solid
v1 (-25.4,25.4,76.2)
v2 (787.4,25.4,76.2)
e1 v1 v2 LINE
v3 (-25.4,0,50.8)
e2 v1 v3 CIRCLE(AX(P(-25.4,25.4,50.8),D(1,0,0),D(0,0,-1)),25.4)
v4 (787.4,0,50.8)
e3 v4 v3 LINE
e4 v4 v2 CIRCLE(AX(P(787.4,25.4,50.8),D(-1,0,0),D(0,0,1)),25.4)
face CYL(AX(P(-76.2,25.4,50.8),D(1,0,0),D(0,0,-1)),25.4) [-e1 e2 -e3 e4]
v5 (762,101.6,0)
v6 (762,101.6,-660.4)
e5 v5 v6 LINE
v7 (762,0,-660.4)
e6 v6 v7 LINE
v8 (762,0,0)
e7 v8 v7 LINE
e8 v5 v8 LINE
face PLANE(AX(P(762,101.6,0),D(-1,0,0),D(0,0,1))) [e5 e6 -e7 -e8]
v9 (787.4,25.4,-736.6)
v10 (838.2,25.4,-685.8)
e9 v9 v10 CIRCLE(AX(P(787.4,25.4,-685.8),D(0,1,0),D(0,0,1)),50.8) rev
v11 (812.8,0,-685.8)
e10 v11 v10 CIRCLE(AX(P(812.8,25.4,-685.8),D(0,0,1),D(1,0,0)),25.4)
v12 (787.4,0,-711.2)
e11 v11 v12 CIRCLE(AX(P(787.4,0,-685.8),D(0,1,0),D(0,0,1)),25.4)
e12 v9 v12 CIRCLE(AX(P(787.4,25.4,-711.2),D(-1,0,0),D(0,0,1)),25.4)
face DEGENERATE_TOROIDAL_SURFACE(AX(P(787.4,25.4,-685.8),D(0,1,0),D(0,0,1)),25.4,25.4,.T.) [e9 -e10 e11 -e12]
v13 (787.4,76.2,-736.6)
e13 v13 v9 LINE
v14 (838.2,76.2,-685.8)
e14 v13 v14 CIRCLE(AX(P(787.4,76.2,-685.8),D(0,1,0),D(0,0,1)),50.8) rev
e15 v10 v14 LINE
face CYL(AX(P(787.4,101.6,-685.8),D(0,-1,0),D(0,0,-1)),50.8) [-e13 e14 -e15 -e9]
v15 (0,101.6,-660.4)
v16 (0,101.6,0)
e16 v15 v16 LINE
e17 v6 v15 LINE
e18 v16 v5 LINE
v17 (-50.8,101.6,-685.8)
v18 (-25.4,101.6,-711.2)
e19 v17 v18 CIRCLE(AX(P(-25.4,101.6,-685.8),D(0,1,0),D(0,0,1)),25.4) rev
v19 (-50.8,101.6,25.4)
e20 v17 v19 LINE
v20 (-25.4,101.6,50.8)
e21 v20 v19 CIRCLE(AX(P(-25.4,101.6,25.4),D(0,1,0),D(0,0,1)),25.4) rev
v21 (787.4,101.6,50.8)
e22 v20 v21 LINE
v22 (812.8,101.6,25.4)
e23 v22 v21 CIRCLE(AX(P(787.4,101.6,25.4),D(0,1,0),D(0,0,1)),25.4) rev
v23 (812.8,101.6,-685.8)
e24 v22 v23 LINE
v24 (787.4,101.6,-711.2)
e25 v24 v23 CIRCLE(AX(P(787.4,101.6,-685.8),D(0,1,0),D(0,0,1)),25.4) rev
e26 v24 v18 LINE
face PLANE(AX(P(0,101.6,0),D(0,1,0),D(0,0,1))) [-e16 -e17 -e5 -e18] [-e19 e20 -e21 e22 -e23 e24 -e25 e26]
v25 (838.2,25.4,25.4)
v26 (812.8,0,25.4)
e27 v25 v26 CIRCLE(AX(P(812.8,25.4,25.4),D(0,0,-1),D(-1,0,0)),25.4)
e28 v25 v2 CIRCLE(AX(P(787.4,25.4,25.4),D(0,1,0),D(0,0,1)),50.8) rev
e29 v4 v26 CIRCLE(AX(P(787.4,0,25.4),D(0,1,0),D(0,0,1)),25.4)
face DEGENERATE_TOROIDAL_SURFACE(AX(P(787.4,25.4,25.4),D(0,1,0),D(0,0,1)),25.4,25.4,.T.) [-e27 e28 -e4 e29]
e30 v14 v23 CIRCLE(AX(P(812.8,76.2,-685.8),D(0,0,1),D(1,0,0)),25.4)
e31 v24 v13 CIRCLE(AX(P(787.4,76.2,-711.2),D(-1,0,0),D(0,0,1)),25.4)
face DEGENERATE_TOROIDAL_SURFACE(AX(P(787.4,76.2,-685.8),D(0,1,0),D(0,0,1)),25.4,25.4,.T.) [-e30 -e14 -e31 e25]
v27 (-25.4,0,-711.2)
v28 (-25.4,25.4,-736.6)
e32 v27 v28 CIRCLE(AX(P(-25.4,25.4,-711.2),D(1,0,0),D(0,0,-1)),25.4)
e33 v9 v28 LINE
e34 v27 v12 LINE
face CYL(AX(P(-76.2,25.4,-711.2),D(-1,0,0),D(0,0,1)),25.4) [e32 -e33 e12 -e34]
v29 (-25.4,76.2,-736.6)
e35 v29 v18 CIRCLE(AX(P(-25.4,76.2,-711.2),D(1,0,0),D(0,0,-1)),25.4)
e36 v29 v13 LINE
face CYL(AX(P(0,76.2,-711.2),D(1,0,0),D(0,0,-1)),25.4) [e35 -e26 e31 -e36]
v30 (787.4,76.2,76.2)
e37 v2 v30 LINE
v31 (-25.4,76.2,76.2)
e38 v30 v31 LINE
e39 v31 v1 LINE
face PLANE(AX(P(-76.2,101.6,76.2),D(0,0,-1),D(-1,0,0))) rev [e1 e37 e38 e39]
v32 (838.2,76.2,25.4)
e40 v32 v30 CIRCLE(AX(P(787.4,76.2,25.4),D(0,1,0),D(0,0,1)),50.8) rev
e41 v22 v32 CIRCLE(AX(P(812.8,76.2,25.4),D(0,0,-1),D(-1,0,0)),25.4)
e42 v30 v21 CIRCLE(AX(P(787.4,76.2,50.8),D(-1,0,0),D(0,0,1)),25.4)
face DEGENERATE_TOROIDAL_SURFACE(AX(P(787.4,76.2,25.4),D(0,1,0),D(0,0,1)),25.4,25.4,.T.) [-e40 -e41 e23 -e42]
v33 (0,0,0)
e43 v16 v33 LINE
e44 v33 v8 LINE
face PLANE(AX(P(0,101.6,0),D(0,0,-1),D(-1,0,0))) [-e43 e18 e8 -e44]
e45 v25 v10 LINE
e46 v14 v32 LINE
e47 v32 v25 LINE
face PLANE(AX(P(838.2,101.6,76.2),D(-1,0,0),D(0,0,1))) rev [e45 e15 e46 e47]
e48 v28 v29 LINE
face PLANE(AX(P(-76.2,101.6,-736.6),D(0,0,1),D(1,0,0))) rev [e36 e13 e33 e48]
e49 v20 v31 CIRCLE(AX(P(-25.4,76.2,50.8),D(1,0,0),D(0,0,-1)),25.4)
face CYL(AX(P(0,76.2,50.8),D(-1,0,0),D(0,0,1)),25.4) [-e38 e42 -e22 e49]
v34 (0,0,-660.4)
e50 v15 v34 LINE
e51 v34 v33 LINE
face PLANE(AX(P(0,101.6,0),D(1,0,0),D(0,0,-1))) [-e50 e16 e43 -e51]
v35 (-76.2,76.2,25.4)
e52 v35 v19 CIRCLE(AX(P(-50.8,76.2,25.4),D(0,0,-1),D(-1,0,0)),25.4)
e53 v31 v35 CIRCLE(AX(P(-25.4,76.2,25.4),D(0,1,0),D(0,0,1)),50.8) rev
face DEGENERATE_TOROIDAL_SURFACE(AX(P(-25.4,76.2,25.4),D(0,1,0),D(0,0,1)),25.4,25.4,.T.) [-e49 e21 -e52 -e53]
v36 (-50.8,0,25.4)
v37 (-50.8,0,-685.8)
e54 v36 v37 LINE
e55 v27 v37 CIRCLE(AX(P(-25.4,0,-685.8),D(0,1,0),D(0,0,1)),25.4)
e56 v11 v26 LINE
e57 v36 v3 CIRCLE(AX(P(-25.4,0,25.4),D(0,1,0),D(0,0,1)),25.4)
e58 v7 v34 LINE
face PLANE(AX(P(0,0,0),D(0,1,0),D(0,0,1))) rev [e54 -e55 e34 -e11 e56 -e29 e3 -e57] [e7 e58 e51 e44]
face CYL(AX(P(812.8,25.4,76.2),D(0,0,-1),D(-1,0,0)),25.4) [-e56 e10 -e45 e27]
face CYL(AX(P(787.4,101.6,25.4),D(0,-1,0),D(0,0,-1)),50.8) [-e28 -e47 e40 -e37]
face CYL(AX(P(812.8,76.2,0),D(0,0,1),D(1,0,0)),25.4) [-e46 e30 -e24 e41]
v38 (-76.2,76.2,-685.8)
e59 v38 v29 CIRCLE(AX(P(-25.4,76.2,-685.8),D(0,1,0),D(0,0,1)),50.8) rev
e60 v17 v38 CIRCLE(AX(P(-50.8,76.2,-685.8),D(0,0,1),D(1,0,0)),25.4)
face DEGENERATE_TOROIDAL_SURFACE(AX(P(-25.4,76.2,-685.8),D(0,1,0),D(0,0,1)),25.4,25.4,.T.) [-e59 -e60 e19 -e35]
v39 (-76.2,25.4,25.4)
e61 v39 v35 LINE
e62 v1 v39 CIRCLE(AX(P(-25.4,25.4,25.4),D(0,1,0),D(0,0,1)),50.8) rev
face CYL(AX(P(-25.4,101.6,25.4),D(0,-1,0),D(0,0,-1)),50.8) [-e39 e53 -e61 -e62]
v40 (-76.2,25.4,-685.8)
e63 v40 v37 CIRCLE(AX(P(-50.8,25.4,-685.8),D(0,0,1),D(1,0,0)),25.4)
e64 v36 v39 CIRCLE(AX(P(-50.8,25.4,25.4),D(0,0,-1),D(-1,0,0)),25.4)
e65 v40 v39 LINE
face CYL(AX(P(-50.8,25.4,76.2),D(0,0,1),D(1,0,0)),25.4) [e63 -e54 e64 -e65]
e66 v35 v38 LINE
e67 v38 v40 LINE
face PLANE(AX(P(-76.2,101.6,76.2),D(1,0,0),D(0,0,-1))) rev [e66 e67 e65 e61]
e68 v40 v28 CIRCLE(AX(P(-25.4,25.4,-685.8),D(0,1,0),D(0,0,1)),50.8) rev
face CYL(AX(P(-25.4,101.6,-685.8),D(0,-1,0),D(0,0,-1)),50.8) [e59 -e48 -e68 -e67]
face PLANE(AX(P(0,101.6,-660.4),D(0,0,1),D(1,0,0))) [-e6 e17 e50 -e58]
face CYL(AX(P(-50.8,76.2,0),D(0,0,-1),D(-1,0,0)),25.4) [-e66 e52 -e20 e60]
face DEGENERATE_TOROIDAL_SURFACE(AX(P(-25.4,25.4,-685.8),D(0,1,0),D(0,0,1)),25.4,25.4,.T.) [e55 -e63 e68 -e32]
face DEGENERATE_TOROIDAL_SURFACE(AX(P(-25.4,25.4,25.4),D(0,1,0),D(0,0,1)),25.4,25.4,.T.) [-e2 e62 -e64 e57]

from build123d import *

# Parameters (mm, degrees)
SKETCH1_W           = 914.4
SKETCH1_H           = 812.8
SKETCH1_W_2         = 762
SKETCH1_H_2         = 660.4
BOSS_EXTRUDE1_DEPTH = 101.6
FILLET1_R           = 25.4
FILLET2_R           = 25.4
FILLET3_R           = 50.8


with BuildPart() as part:
    # Sketch1 → Boss-Extrude1 (new body)
    with BuildSketch(Plane(origin=(0, 0, 0), x_dir=(1, 0, 0), z_dir=(0, 1, 0))):
        with Locations((381, 330.2)):
            Rectangle(SKETCH1_W, SKETCH1_H)
        with Locations((381, 330.2)):
            Rectangle(SKETCH1_W_2, SKETCH1_H_2, mode=Mode.SUBTRACT)
    extrude(amount=BOSS_EXTRUDE1_DEPTH)

    # Fillet1
    fillet1_edges = [part.edges().sort_by_distance(p)[0] for p in [
        (381, 101.6, -736.6),
        (-76.2, 101.6, -330.2),
        (381, 101.6, 76.2),
        (838.2, 101.6, -330.2),
    ]]
    fillet(fillet1_edges, radius=FILLET1_R)

    # Fillet2
    fillet2_edges = [part.edges().sort_by_distance(p)[0] for p in [
        (-76.2, 0, -330.2),
        (381, 0, -736.6),
        (838.2, 0, -330.2),
        (381, 0, 76.2),
    ]]
    fillet(fillet2_edges, radius=FILLET2_R)

    # Fillet3
    # the kernel refuses this fillet: 50.8 mm, written as the material it takes off along each edge
    with BuildSketch(Plane(origin=(-25.4, 101.6, -685.8), x_dir=(0, 0, -1), z_dir=(1, 0, 0))) as fillet3_piece_1:
        with BuildLine():
            CenterArc((25.4, -25.4), 25.4, 0, 90)
            Line((50.8, -25.4), (50.8, 0))
            Line((50.8, 0), (25.4, 0))
        make_face()
    revolve(axis=Axis((-25.4, 101.6, -685.8), (0, 1, 0)), revolution_arc=90, mode=Mode.SUBTRACT)
    with BuildSketch(Plane(origin=(787.4, 101.6, -685.8), x_dir=(1, 0, 0), z_dir=(0, 0, 1))) as fillet3_piece_2:
        with BuildLine():
            CenterArc((25.4, -25.4), 25.4, 0, 90)
            Line((50.8, -25.4), (50.8, 0))
            Line((50.8, 0), (25.4, 0))
        make_face()
    revolve(axis=Axis((787.4, 101.6, -685.8), (0, 1, 0)), revolution_arc=90, mode=Mode.SUBTRACT)
    with BuildSketch(Plane(origin=(-25.4, 101.6, 25.4), x_dir=(-1, 0, 0), z_dir=(0, 0, -1))) as fillet3_piece_3:
        with BuildLine():
            CenterArc((25.4, -25.4), 25.4, 0, 90)
            Line((50.8, -25.4), (50.8, 0))
            Line((50.8, 0), (25.4, 0))
        make_face()
    revolve(axis=Axis((-25.4, 101.6, 25.4), (0, 1, 0)), revolution_arc=90, mode=Mode.SUBTRACT)
    with BuildSketch(Plane(origin=(787.4, 101.6, 25.4), x_dir=(0, 0, 1), z_dir=(-1, 0, 0))) as fillet3_piece_4:
        with BuildLine():
            CenterArc((25.4, -25.4), 25.4, 0, 90)
            Line((50.8, -25.4), (50.8, 0))
            Line((50.8, 0), (25.4, 0))
        make_face()
    revolve(axis=Axis((787.4, 101.6, 25.4), (0, 1, 0)), revolution_arc=90, mode=Mode.SUBTRACT)
    with BuildSketch(Plane(origin=(787.4, 0, 25.4), x_dir=(1, 0, 0), z_dir=(0, 0, -1))) as fillet3_piece_5:
        with BuildLine():
            CenterArc((25.4, -25.4), 25.4, 0, 90)
            Line((50.8, -25.4), (50.8, 0))
            Line((50.8, 0), (25.4, 0))
        make_face()
    revolve(axis=Axis((787.4, 0, 25.4), (0, -1, 0)), revolution_arc=90, mode=Mode.SUBTRACT)
    with BuildSketch(Plane(origin=(-25.4, 0, 25.4), x_dir=(0, 0, 1), z_dir=(1, 0, 0))) as fillet3_piece_6:
        with BuildLine():
            CenterArc((25.4, -25.4), 25.4, 0, 90)
            Line((50.8, -25.4), (50.8, 0))
            Line((50.8, 0), (25.4, 0))
        make_face()
    revolve(axis=Axis((-25.4, 0, 25.4), (0, -1, 0)), revolution_arc=90, mode=Mode.SUBTRACT)
    with BuildSketch(Plane(origin=(787.4, 0, -685.8), x_dir=(0, 0, -1), z_dir=(-1, 0, 0))) as fillet3_piece_7:
        with BuildLine():
            CenterArc((25.4, -25.4), 25.4, 0, 90)
            Line((50.8, -25.4), (50.8, 0))
            Line((50.8, 0), (25.4, 0))
        make_face()
    revolve(axis=Axis((787.4, 0, -685.8), (0, -1, 0)), revolution_arc=90, mode=Mode.SUBTRACT)
    with BuildSketch(Plane(origin=(-25.4, 0, -685.8), x_dir=(-1, 0, 0), z_dir=(0, 0, 1))) as fillet3_piece_8:
        with BuildLine():
            CenterArc((25.4, -25.4), 25.4, 0, 90)
            Line((50.8, -25.4), (50.8, 0))
            Line((50.8, 0), (25.4, 0))
        make_face()
    revolve(axis=Axis((-25.4, 0, -685.8), (0, -1, 0)), revolution_arc=90, mode=Mode.SUBTRACT)
    with BuildSketch(Plane(origin=(838.2, 0, 76.2), x_dir=(-1, 0, 0), z_dir=(0, 1, 0)), Plane(origin=(-76.2, 0, 76.2), x_dir=(0, 0, -1), z_dir=(0, 1, 0))) as fillet3_piece_9:
        with BuildLine():
            CenterArc((FILLET3_R, -FILLET3_R), FILLET3_R, 90, 90)
            Line((0, -FILLET3_R), (0, 0))
            Line((0, 0), (FILLET3_R, 0))
        make_face()
    extrude(amount=101.6, mode=Mode.SUBTRACT)
    with BuildSketch(Plane(origin=(838.2, 0, -736.6), x_dir=(-1, 0, 0), z_dir=(0, 1, 0)), Plane(origin=(-76.2, 0, -736.6), x_dir=(0, 0, 1), z_dir=(0, 1, 0))) as fillet3_piece_10:
        with BuildLine():
            CenterArc((FILLET3_R, FILLET3_R), FILLET3_R, 180, 90)
            Line((0, FILLET3_R), (0, 0))
            Line((0, 0), (FILLET3_R, 0))
        make_face()
    extrude(amount=101.6, mode=Mode.SUBTRACT)


solid = part.part
